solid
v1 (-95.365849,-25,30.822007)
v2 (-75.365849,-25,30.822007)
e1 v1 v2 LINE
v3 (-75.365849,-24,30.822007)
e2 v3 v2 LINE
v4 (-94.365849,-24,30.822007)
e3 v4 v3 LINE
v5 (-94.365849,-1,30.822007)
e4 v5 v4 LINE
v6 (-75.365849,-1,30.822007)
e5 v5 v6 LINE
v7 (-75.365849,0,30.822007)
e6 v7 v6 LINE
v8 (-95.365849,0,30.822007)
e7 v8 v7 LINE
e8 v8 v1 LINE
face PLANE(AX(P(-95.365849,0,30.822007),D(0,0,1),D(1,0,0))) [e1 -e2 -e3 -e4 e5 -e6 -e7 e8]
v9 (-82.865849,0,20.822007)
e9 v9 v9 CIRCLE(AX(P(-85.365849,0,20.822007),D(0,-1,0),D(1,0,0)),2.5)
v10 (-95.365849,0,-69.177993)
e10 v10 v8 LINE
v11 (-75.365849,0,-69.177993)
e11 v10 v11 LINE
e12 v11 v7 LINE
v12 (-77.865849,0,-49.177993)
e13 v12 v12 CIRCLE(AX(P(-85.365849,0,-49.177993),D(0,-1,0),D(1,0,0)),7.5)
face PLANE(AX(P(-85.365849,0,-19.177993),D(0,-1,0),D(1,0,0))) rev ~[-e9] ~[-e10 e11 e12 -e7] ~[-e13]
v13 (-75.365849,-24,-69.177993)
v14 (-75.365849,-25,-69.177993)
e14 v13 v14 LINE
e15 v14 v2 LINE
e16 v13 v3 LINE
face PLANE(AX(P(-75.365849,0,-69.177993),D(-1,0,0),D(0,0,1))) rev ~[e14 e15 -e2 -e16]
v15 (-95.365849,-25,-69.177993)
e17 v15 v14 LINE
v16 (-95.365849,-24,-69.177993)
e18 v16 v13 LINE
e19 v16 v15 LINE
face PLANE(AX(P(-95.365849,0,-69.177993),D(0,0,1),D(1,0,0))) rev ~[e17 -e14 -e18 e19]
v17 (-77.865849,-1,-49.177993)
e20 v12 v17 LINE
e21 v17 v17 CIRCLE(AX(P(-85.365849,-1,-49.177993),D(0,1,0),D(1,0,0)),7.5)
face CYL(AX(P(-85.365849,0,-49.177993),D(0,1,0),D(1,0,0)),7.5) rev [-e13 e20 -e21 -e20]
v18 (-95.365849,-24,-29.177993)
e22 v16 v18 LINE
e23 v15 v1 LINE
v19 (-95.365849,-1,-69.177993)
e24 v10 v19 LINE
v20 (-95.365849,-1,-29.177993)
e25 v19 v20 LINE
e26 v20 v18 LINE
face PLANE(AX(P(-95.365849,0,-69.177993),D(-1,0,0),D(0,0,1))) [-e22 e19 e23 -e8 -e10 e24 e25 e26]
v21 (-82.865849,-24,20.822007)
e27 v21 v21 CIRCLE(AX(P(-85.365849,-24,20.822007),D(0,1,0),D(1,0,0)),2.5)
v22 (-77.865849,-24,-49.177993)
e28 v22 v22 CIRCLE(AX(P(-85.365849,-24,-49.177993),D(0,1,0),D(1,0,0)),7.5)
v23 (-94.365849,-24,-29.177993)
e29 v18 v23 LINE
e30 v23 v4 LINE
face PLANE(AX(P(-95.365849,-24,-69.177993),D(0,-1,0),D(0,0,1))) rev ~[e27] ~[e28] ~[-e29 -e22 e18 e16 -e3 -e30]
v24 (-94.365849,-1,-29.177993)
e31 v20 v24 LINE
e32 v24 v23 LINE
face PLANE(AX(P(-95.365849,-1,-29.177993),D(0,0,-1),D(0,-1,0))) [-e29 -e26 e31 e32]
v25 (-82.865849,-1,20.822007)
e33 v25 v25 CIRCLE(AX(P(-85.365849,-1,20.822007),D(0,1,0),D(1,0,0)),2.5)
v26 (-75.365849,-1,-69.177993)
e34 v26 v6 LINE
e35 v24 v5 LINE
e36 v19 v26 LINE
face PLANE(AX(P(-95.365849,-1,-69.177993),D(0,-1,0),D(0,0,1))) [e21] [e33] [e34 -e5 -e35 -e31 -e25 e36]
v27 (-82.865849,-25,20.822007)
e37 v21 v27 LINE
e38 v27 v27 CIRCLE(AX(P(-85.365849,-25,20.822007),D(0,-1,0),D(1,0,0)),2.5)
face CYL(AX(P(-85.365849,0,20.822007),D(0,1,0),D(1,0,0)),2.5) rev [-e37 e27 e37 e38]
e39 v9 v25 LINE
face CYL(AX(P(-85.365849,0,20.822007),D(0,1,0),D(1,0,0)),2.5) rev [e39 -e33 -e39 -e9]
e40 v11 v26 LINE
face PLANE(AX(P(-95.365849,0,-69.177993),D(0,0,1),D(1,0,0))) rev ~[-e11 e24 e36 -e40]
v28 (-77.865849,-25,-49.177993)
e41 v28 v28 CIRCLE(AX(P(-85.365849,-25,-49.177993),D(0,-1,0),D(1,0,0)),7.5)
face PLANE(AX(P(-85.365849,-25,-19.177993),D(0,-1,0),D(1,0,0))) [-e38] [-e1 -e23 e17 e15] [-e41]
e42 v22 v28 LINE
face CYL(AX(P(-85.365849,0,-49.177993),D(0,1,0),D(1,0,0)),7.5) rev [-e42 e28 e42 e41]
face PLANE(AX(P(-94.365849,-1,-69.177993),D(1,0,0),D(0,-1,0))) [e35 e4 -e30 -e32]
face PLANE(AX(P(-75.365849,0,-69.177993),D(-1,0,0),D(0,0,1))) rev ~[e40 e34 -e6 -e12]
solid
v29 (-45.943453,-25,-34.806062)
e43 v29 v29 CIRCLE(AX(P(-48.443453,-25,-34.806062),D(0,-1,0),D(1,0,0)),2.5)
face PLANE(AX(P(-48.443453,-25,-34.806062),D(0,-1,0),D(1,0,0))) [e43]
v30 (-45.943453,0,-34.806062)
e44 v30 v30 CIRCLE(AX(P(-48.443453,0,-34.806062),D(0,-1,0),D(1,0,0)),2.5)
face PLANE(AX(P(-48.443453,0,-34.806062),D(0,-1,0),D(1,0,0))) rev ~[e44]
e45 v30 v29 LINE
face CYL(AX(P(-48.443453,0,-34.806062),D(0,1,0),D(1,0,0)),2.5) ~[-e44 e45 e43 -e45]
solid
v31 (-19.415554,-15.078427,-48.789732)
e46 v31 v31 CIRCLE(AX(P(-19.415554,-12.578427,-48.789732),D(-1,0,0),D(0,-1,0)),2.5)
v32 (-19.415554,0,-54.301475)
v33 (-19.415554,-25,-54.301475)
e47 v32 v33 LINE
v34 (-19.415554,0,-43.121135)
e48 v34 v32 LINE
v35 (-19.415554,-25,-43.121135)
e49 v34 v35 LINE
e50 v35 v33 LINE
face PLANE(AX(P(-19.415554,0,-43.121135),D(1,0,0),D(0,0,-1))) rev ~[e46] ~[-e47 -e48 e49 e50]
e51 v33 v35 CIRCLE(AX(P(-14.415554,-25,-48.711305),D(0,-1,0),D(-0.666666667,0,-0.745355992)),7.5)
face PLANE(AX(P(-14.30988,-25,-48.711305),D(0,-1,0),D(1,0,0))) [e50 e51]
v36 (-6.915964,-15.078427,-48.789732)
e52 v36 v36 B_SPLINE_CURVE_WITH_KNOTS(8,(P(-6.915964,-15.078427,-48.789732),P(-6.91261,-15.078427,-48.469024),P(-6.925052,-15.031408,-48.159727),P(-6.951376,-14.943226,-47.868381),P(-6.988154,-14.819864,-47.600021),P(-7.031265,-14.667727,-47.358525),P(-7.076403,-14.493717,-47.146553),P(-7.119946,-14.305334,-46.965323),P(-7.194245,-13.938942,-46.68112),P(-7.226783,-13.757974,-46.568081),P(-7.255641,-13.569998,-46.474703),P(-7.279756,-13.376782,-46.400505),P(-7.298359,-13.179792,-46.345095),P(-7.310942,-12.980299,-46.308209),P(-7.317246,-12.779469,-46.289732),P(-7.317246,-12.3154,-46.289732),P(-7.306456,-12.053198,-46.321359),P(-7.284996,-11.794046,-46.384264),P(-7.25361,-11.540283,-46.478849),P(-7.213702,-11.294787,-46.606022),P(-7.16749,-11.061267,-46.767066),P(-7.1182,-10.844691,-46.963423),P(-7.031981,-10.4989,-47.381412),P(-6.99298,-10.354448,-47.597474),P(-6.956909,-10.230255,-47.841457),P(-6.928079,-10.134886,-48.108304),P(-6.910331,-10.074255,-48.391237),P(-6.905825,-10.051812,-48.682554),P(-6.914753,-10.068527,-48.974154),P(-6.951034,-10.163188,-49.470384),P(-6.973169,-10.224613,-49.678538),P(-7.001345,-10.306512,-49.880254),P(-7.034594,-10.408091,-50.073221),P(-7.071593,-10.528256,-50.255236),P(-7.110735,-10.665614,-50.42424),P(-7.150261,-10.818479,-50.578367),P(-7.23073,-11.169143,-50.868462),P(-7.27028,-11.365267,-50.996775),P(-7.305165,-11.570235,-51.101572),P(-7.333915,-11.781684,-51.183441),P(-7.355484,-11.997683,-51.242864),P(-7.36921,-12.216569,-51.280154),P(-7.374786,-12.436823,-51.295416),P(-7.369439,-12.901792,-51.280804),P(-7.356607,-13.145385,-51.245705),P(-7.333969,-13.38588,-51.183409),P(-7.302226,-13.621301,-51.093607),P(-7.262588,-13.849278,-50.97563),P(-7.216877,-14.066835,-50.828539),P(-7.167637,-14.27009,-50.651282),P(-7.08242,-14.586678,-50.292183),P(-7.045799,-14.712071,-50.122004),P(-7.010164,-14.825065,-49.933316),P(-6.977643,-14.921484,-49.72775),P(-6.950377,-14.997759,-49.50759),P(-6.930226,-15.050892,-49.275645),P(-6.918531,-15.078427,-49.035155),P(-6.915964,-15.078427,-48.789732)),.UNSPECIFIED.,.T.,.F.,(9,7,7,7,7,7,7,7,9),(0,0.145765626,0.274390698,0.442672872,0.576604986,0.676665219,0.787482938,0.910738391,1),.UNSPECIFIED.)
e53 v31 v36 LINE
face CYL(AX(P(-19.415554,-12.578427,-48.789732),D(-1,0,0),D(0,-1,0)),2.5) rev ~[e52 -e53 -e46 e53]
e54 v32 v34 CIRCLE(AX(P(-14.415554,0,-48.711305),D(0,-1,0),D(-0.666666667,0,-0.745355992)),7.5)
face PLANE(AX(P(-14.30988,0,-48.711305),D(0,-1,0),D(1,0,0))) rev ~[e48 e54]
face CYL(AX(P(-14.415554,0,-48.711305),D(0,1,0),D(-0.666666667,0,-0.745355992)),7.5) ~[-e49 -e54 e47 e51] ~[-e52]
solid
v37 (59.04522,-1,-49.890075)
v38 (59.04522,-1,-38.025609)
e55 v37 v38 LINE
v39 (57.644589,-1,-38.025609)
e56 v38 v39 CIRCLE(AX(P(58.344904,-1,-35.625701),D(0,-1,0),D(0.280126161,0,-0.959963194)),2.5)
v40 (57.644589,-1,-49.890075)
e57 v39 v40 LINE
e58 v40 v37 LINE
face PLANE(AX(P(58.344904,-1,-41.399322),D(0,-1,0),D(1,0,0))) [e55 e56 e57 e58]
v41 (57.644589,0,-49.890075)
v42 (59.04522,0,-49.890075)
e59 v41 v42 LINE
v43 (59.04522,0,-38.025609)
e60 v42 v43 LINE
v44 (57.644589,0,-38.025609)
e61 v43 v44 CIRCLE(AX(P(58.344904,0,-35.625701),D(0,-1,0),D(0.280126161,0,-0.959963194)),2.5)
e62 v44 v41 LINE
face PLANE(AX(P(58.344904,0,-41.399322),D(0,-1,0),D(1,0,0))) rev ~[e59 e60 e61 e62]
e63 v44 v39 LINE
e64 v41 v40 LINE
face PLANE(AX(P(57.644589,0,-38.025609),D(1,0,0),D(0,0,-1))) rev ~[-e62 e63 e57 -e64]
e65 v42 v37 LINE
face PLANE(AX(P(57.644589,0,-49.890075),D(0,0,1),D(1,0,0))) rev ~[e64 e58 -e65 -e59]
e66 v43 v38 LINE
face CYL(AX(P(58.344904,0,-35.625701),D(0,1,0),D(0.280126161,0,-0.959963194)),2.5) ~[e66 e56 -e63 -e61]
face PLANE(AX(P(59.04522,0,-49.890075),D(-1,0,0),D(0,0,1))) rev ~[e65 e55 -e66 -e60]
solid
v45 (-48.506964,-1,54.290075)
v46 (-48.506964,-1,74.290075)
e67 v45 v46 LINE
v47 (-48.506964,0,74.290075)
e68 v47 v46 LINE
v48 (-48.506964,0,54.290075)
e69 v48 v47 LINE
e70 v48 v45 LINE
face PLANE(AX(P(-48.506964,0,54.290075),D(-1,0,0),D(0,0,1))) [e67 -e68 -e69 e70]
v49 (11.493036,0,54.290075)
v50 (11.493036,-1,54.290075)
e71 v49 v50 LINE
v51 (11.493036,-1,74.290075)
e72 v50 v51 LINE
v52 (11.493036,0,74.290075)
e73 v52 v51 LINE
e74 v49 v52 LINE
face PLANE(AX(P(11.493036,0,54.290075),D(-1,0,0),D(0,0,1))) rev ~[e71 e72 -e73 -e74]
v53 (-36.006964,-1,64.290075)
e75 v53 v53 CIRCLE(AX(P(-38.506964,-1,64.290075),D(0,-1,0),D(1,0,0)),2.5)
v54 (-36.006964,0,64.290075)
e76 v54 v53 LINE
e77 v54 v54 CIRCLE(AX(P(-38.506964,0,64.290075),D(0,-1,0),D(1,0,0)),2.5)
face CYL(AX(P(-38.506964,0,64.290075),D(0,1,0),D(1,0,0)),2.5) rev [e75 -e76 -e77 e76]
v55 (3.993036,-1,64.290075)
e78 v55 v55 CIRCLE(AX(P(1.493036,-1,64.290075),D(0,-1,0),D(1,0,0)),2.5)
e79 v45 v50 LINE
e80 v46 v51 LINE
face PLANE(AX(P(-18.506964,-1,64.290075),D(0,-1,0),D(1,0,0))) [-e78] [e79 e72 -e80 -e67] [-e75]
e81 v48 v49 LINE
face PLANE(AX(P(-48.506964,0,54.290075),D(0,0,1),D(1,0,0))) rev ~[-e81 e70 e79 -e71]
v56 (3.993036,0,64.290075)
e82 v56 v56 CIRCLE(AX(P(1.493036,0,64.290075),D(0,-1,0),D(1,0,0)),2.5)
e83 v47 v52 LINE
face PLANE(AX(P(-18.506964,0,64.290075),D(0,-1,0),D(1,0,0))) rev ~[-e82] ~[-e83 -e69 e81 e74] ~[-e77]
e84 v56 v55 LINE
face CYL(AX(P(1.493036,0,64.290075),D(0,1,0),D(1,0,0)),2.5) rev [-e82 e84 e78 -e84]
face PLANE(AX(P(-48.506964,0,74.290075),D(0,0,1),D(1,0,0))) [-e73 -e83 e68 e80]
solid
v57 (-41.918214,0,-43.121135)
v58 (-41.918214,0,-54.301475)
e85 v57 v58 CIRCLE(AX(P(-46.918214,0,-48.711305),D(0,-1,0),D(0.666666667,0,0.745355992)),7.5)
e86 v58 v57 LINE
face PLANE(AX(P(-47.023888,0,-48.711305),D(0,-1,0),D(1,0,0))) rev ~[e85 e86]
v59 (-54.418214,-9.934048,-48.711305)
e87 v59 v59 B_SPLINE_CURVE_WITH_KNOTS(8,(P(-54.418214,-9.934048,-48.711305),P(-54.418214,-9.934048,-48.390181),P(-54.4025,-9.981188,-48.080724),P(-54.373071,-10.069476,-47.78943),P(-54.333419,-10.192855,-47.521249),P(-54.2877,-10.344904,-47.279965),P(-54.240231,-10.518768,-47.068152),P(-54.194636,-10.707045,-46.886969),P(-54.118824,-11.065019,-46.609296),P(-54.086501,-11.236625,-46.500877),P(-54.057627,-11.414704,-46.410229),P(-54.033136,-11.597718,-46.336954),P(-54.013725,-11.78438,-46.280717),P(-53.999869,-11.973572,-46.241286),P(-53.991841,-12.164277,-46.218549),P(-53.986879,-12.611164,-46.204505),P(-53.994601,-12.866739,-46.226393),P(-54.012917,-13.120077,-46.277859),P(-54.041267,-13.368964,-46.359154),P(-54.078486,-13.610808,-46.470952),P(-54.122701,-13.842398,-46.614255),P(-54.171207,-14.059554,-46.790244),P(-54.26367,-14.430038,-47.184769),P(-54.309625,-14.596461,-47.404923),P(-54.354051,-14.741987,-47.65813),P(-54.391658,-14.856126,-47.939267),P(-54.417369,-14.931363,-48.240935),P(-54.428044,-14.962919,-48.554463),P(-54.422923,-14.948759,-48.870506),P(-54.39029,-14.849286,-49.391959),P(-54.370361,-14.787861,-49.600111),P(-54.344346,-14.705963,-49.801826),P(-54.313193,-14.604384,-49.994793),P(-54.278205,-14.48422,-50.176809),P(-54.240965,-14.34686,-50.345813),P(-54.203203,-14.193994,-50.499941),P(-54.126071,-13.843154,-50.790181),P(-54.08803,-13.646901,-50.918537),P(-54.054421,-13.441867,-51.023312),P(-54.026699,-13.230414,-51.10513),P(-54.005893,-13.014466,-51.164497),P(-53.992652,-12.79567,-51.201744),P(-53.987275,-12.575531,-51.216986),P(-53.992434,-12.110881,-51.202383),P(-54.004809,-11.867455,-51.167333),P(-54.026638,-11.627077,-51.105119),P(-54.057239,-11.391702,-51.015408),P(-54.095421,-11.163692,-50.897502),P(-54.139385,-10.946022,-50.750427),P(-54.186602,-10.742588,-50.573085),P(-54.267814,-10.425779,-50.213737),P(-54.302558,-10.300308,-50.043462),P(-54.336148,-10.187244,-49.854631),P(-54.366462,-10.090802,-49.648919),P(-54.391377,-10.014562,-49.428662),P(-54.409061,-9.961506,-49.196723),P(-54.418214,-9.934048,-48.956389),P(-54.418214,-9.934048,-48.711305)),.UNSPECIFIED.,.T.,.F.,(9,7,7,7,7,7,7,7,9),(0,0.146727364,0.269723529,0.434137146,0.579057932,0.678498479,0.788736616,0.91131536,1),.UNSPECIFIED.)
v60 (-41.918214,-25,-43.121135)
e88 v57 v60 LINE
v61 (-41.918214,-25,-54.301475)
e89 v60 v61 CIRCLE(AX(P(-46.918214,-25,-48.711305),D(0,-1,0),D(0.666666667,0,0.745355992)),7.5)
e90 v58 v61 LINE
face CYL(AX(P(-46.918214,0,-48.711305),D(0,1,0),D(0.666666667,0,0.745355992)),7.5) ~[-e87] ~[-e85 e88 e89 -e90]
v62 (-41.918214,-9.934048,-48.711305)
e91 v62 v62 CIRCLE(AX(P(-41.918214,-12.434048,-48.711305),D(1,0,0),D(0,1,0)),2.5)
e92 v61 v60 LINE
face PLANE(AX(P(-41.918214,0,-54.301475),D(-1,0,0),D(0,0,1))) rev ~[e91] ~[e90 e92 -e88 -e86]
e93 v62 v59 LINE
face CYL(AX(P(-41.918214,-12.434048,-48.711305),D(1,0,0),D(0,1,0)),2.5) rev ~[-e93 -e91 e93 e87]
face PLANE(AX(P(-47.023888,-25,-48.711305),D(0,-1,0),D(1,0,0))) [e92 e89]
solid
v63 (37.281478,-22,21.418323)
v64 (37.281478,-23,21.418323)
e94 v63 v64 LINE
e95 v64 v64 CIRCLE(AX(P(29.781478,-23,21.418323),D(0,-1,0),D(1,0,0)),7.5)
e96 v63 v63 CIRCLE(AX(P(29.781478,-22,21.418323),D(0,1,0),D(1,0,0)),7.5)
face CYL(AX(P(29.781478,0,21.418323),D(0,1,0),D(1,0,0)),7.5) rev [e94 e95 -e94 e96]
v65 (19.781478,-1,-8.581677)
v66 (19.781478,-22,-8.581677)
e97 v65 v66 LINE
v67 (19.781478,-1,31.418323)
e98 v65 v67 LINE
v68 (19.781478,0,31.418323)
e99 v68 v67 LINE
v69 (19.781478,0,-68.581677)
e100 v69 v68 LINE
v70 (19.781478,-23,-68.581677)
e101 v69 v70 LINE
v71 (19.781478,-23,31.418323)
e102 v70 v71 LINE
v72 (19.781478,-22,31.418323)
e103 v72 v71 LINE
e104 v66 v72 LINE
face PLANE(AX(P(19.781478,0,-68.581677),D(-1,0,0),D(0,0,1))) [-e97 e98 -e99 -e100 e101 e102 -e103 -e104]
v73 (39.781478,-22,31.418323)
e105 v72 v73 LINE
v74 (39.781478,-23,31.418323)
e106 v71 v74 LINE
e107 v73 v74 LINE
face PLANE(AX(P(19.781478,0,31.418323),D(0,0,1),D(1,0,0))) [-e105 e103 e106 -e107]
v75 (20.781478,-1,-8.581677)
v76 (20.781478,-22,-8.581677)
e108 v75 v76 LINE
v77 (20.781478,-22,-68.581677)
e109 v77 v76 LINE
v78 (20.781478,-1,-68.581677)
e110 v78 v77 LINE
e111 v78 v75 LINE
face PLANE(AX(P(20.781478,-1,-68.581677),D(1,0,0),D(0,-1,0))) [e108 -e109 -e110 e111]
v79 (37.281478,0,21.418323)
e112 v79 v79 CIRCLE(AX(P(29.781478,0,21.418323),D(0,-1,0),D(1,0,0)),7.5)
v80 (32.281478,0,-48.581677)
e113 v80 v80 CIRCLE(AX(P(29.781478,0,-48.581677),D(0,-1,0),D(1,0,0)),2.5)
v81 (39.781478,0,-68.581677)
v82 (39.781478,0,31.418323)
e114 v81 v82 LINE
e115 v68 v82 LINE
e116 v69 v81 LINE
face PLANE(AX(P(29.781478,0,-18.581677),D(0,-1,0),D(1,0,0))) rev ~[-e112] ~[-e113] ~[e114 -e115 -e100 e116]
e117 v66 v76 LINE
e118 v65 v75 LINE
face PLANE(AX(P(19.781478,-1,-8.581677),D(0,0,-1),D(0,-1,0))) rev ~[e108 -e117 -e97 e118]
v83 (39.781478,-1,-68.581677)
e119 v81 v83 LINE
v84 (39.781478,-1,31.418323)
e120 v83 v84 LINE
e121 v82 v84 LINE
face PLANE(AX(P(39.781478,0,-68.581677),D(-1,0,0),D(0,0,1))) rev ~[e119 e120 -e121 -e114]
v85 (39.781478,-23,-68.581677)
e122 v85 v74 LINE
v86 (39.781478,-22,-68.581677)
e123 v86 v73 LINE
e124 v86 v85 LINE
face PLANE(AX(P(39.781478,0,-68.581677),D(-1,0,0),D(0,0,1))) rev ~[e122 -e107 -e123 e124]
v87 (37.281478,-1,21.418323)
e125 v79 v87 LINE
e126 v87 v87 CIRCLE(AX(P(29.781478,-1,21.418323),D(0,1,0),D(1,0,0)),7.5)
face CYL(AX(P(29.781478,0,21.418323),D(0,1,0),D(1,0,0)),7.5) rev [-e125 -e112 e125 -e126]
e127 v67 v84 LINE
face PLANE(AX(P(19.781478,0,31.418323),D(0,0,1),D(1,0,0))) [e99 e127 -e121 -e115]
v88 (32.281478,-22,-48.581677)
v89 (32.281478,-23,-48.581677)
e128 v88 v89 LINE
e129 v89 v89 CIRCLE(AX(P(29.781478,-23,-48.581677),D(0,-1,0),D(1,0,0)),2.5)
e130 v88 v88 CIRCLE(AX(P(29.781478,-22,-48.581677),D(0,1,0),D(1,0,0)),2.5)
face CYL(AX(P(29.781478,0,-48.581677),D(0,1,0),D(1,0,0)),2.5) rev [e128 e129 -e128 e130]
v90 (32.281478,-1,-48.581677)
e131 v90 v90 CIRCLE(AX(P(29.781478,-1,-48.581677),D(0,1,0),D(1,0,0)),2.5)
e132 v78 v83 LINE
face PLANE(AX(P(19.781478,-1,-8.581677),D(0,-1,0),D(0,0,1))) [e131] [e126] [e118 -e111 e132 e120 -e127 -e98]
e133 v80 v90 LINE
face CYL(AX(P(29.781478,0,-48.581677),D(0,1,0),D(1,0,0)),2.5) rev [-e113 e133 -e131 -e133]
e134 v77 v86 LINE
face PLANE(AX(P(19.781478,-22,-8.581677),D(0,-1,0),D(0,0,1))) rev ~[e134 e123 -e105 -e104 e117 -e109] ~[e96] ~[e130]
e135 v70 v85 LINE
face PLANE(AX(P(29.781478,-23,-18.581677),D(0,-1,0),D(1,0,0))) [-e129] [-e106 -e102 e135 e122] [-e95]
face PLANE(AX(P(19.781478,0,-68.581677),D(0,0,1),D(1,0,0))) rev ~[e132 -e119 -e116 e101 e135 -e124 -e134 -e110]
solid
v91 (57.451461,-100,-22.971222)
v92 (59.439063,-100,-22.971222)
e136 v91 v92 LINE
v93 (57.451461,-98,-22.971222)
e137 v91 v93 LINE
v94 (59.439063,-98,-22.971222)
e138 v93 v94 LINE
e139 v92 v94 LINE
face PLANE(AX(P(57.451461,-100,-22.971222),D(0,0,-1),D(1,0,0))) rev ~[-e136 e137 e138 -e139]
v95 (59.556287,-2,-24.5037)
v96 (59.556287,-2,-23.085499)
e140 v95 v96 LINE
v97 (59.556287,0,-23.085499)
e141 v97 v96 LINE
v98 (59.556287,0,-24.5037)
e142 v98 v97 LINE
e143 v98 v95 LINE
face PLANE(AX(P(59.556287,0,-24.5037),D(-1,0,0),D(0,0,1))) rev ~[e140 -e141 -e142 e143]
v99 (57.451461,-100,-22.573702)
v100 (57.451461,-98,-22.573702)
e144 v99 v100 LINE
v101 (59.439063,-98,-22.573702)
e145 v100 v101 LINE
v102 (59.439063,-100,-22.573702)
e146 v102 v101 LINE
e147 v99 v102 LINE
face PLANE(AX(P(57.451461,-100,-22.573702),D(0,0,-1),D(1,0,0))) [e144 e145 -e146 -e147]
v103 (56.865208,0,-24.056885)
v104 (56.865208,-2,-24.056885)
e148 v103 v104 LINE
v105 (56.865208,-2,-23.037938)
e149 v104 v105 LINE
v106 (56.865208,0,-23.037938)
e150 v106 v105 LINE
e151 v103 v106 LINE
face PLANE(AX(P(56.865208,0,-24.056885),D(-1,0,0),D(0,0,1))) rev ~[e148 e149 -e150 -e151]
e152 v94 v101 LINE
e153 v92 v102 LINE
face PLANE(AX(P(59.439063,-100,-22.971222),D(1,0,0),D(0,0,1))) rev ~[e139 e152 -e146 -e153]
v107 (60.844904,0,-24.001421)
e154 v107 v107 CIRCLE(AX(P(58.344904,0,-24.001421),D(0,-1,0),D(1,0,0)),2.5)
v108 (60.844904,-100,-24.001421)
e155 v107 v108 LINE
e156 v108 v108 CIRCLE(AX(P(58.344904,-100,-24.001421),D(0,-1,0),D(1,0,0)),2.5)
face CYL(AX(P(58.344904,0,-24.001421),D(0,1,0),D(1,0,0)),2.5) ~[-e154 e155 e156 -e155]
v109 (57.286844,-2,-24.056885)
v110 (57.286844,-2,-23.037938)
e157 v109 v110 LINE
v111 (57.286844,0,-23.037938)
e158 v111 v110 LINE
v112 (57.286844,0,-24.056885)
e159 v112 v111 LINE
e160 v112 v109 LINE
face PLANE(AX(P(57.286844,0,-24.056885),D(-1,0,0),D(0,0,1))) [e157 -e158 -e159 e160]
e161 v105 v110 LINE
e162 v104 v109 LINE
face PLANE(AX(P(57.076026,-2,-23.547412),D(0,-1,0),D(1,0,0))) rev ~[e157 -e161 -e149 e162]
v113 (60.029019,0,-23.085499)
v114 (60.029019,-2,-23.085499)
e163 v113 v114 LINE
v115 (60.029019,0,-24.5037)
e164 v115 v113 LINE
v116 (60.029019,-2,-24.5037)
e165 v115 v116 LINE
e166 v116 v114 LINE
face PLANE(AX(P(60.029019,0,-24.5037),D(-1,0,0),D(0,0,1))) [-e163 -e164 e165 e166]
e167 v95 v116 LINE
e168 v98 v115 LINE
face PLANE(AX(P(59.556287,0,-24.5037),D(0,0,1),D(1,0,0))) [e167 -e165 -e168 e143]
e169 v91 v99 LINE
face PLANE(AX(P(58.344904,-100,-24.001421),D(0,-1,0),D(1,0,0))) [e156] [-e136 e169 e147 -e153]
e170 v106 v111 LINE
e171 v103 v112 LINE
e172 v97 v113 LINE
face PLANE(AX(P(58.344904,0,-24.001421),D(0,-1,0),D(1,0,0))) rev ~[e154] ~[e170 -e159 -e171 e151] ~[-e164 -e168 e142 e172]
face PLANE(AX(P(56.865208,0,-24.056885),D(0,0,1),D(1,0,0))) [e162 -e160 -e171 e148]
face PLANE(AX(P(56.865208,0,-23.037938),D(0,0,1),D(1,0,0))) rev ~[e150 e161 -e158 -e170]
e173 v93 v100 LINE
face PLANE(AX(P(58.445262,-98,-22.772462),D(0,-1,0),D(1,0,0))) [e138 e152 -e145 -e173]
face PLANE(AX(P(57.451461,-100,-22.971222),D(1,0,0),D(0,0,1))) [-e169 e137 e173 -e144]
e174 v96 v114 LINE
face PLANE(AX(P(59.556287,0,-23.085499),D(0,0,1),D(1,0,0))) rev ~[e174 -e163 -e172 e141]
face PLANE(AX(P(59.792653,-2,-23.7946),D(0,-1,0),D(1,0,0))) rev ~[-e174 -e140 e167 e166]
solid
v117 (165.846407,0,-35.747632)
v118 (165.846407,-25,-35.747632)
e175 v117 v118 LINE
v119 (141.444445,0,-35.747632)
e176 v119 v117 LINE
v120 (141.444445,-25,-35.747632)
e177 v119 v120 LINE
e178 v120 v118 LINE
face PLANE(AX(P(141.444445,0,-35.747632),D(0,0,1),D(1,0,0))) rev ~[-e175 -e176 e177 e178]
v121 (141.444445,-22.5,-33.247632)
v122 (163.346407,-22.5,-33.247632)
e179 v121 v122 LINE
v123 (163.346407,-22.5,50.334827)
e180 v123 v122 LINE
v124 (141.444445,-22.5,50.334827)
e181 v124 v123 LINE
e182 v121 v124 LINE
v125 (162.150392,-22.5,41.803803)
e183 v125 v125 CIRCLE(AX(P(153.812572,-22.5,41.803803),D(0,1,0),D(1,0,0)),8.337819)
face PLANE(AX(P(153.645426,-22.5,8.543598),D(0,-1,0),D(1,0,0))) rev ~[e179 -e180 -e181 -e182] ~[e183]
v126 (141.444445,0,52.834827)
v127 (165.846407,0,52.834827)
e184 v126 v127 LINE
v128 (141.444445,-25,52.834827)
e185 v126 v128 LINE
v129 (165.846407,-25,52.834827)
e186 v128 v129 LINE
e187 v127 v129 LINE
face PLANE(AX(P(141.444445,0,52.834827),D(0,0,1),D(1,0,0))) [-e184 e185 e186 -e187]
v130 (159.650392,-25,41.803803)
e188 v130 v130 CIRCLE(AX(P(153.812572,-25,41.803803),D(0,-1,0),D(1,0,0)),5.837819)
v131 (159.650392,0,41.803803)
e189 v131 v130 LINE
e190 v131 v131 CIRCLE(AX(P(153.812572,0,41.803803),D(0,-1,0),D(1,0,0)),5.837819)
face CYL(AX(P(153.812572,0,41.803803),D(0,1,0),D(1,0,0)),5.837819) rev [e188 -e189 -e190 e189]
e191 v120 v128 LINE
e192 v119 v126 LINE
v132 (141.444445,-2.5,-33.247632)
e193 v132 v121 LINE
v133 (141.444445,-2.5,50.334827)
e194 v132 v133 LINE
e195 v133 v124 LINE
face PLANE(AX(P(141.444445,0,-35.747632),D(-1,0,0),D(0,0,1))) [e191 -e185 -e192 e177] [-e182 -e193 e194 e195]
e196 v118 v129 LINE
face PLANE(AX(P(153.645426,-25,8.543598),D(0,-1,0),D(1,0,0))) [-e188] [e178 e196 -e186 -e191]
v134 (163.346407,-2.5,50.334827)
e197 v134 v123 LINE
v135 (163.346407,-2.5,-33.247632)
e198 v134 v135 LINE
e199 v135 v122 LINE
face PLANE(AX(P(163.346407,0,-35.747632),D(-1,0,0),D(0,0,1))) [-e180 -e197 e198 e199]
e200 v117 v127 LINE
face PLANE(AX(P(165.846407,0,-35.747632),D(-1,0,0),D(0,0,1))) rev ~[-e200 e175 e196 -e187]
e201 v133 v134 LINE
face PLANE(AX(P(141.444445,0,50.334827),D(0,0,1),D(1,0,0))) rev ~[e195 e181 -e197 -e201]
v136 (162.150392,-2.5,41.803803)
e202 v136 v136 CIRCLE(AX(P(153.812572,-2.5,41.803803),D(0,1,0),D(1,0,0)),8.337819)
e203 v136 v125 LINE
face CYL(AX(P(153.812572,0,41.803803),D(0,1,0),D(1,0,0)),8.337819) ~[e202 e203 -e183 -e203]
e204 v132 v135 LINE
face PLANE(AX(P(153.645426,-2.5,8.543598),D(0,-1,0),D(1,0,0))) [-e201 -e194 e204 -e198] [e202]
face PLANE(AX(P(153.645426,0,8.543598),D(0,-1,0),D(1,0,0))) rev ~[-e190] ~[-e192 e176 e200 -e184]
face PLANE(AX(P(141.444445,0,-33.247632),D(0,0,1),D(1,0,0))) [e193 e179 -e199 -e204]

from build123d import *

# Parameters (mm, degrees)
F0_W      = 20
F0_H      = 100
F0_R      = 7.5
F0_R_2    = 2.5
F1_DEPTH  = 25
F2_DEPTH  = 25
F3_W      = 19
F3_H      = 23
F4_DEPTH  = 100
F5_DEPTH  = 23
F6_W      = 19
F6_H      = 21
F7_DEPTH  = 100
F8_W      = 23
F8_H      = 40
F9_DEPTH  = 1
F10_W     = 21
F10_H     = 40
F11_DEPTH = 1
F12_DEPTH = 25
F13_R     = 2.5
F14_DEPTH = 12.5
F15_DEPTH = 25
F16_R     = 2.5
F17_DEPTH = 12.5010001006
F18_DEPTH = 100
F19_DEPTH = 1
F20_W     = 1.9876025617
F20_H     = 0.3975201398
F21_DEPTH = 2
F22_W     = 0.4727318883
F22_H     = 1.4182012528
F22_W_2   = 0.4216358066
F22_H_2   = 1.0189469904
F23_DEPTH = 2
F0_W_2    = 60
F0_H_2    = 20
F24_DEPTH = 1
F0_W_3    = 24.4019627571
F0_H_3    = 88.5824598372
F0_R_3    = 5.8378194673
F25_DEPTH = 25
F26_T     = -2.5


with BuildPart() as f1:
    # F0 (on Front) → F1 (new body)
    with BuildSketch(Plane.XZ):
        with Locations((-85.3658488447, -19.1779926979)):
            Rectangle(F0_W, F0_H)
        with Locations((-85.3658488447, -49.1779926979)):
            Circle(F0_R, mode=Mode.SUBTRACT)
        with Locations((-85.3658488447, 20.8220073021)):
            Circle(F0_R_2, mode=Mode.SUBTRACT)
    extrude(amount=F1_DEPTH)

    # F3 (on face) → F4 (cut)
    with BuildSketch(Plane(origin=(0, 0, -69.1779926979), x_dir=(1, 0, 0), z_dir=(0, 0, -1))):
        with Locations((-84.8658488447, 12.5)):
            Rectangle(F3_W, F3_H)
    extrude(amount=-F4_DEPTH, mode=Mode.SUBTRACT)

    # F8 (on face) → F9 (cut, through all)
    with BuildSketch(Plane(origin=(-95.3658488447, 0, 0), x_dir=(0, -1, 0), z_dir=(-1, 0, 0))):
        with Locations((12.5, -49.1779926979)):
            Rectangle(F8_W, F8_H)
    extrude(amount=-F9_DEPTH, mode=Mode.SUBTRACT)


with BuildPart() as f2:
    # F0 (on Front) → F2 (new body)
    with BuildSketch(Plane.XZ):
        with Locations((-48.4434533864, -34.8060615361)):
            Circle(F0_R_2)
    extrude(amount=F2_DEPTH)


with BuildPart() as f5:
    # F0 (on Front) → F5 (new body)
    with BuildSketch(Plane.XZ):
        with Locations((29.7814775258, -18.581676666)):
            Rectangle(F0_W, F0_H)
        with Locations((29.7814775258, -48.581676666)):
            Circle(F0_R_2, mode=Mode.SUBTRACT)
        with Locations((29.7814775258, 21.418323334)):
            Circle(F0_R, mode=Mode.SUBTRACT)
    extrude(amount=F5_DEPTH)

    # F6 (on face) → F7 (cut)
    with BuildSketch(Plane(origin=(0, 0, -68.581676666), x_dir=(1, 0, 0), z_dir=(0, 0, -1))):
        with Locations((30.2814775258, 11.5)):
            Rectangle(F6_W, F6_H)
    extrude(amount=-F7_DEPTH, mode=Mode.SUBTRACT)

    # F10 (on face) → F11 (cut, through all)
    with BuildSketch(Plane(origin=(19.7814775258, 0, 0), x_dir=(0, -1, 0), z_dir=(-1, 0, 0))):
        with Locations((11.5, 11.418323334)):
            Rectangle(F10_W, F10_H)
    extrude(amount=-F11_DEPTH, mode=Mode.SUBTRACT)


with BuildPart() as f12:
    # F0 (on Front) → F12 (new body)
    with BuildSketch(Plane.XZ):
        with BuildLine():
            Line((-41.9182138266, -54.3014750868), (-41.9182138266, -43.1211351993))
            ThreePointArc((-41.9182138266, -43.1211351993), (-54.4182138266, -48.7113051431), (-41.9182138266, -54.3014750868))
        make_face()
    extrude(amount=F12_DEPTH)

    # F13 (on face) → F14 (cut, through all)
    with BuildSketch(Plane.YZ.offset(-41.9182138266)):
        with Locations((-12.4340476468, -48.7113051431)):
            Circle(F13_R)
    extrude(amount=-F14_DEPTH, mode=Mode.SUBTRACT)


with BuildPart() as f15:
    # F0 (on Front) → F15 (new body)
    with BuildSketch(Plane.XZ):
        with BuildLine():
            ThreePointArc((-19.4155542431, -54.3014750868), (-6.9155542431, -48.7113051431), (-19.4155542431, -43.1211351993))
            Line((-19.4155542431, -43.1211351993), (-19.4155542431, -54.3014750868))
        make_face()
    extrude(amount=F15_DEPTH)

    # F16 (on face) → F17 (cut, through all)
    with BuildSketch(Plane(origin=(-19.4155542431, 0, 0), x_dir=(0, -1, 0), z_dir=(-1, 0, 0))):
        with Locations((12.5784268603, -48.7897321582)):
            Circle(F16_R)
    extrude(amount=-F17_DEPTH, mode=Mode.SUBTRACT)


with BuildPart() as f18:
    # F0 (on Front) → F18 (new body)
    with BuildSketch(Plane.XZ):
        with Locations((58.3449043334, -24.0014214069)):
            Circle(F0_R_2)
    extrude(amount=F18_DEPTH)

    # F20 (on face) → F21 (cut)
    with BuildSketch(Plane.XZ.offset(100)):
        with Locations((58.4452617913, -22.7724621072)):
            Rectangle(F20_W, F20_H)
    extrude(amount=-F21_DEPTH, mode=Mode.SUBTRACT)

    # F22 (on face) → F23 (cut)
    with BuildSketch(Plane.XZ):
        with Locations((59.7926527262, -23.7945998088)):
            Rectangle(F22_W, F22_H)
        with Locations((57.0760257542, -23.5474118963)):
            Rectangle(F22_W_2, F22_H_2)
    extrude(amount=F23_DEPTH, mode=Mode.SUBTRACT)


with BuildPart() as f19:
    # F0 (on Front) → F19 (new body)
    with BuildSketch(Plane.XZ):
        with BuildLine():
            Line((59.0452197349, -49.8900748789), (59.0452197349, -38.0256086664))
            ThreePointArc((59.0452197349, -38.0256086664), (58.3449043334, -33.125700681), (57.6445889318, -38.0256086664))
            Line((57.6445889318, -38.0256086664), (57.6445889318, -49.8900748789))
            Line((57.6445889318, -49.8900748789), (58.3449043334, -49.8900748789))
            Line((58.3449043334, -49.8900748789), (59.0452197349, -49.8900748789))
        make_face()
    extrude(amount=F19_DEPTH)


with BuildPart() as f24:
    # F0 (on Front) → F24 (new body)
    with BuildSketch(Plane.XZ):
        with Locations((-18.5069639981, 64.2900748551)):
            Rectangle(F0_W_2, F0_H_2)
        with Locations((-38.5069639981, 64.2900748551)):
            Circle(F0_R_2, mode=Mode.SUBTRACT)
        with Locations((1.4930360019, 64.2900748551)):
            Circle(F0_R_2, mode=Mode.SUBTRACT)
    extrude(amount=F24_DEPTH)


with BuildPart() as f25:
    # F0 (on Front) → F25 (new body)
    with BuildSketch(Plane.XZ):
        with Locations((153.6454260349, 8.5435975343)):
            Rectangle(F0_W_3, F0_H_3)
        with Locations((153.81257236, 41.8038032949)):
            Circle(F0_R_3, mode=Mode.SUBTRACT)
    extrude(amount=F25_DEPTH)

    # F26
    f26_openings = [f25.faces().sort_by_distance(p)[0] for p in [
        (141.444445, -12.5, 8.543598),
    ]]
    offset(amount=F26_T, openings=f26_openings)


solid = Compound([f1.part, f2.part, f5.part, f12.part, f15.part, f18.part, f19.part, f24.part, f25.part])
